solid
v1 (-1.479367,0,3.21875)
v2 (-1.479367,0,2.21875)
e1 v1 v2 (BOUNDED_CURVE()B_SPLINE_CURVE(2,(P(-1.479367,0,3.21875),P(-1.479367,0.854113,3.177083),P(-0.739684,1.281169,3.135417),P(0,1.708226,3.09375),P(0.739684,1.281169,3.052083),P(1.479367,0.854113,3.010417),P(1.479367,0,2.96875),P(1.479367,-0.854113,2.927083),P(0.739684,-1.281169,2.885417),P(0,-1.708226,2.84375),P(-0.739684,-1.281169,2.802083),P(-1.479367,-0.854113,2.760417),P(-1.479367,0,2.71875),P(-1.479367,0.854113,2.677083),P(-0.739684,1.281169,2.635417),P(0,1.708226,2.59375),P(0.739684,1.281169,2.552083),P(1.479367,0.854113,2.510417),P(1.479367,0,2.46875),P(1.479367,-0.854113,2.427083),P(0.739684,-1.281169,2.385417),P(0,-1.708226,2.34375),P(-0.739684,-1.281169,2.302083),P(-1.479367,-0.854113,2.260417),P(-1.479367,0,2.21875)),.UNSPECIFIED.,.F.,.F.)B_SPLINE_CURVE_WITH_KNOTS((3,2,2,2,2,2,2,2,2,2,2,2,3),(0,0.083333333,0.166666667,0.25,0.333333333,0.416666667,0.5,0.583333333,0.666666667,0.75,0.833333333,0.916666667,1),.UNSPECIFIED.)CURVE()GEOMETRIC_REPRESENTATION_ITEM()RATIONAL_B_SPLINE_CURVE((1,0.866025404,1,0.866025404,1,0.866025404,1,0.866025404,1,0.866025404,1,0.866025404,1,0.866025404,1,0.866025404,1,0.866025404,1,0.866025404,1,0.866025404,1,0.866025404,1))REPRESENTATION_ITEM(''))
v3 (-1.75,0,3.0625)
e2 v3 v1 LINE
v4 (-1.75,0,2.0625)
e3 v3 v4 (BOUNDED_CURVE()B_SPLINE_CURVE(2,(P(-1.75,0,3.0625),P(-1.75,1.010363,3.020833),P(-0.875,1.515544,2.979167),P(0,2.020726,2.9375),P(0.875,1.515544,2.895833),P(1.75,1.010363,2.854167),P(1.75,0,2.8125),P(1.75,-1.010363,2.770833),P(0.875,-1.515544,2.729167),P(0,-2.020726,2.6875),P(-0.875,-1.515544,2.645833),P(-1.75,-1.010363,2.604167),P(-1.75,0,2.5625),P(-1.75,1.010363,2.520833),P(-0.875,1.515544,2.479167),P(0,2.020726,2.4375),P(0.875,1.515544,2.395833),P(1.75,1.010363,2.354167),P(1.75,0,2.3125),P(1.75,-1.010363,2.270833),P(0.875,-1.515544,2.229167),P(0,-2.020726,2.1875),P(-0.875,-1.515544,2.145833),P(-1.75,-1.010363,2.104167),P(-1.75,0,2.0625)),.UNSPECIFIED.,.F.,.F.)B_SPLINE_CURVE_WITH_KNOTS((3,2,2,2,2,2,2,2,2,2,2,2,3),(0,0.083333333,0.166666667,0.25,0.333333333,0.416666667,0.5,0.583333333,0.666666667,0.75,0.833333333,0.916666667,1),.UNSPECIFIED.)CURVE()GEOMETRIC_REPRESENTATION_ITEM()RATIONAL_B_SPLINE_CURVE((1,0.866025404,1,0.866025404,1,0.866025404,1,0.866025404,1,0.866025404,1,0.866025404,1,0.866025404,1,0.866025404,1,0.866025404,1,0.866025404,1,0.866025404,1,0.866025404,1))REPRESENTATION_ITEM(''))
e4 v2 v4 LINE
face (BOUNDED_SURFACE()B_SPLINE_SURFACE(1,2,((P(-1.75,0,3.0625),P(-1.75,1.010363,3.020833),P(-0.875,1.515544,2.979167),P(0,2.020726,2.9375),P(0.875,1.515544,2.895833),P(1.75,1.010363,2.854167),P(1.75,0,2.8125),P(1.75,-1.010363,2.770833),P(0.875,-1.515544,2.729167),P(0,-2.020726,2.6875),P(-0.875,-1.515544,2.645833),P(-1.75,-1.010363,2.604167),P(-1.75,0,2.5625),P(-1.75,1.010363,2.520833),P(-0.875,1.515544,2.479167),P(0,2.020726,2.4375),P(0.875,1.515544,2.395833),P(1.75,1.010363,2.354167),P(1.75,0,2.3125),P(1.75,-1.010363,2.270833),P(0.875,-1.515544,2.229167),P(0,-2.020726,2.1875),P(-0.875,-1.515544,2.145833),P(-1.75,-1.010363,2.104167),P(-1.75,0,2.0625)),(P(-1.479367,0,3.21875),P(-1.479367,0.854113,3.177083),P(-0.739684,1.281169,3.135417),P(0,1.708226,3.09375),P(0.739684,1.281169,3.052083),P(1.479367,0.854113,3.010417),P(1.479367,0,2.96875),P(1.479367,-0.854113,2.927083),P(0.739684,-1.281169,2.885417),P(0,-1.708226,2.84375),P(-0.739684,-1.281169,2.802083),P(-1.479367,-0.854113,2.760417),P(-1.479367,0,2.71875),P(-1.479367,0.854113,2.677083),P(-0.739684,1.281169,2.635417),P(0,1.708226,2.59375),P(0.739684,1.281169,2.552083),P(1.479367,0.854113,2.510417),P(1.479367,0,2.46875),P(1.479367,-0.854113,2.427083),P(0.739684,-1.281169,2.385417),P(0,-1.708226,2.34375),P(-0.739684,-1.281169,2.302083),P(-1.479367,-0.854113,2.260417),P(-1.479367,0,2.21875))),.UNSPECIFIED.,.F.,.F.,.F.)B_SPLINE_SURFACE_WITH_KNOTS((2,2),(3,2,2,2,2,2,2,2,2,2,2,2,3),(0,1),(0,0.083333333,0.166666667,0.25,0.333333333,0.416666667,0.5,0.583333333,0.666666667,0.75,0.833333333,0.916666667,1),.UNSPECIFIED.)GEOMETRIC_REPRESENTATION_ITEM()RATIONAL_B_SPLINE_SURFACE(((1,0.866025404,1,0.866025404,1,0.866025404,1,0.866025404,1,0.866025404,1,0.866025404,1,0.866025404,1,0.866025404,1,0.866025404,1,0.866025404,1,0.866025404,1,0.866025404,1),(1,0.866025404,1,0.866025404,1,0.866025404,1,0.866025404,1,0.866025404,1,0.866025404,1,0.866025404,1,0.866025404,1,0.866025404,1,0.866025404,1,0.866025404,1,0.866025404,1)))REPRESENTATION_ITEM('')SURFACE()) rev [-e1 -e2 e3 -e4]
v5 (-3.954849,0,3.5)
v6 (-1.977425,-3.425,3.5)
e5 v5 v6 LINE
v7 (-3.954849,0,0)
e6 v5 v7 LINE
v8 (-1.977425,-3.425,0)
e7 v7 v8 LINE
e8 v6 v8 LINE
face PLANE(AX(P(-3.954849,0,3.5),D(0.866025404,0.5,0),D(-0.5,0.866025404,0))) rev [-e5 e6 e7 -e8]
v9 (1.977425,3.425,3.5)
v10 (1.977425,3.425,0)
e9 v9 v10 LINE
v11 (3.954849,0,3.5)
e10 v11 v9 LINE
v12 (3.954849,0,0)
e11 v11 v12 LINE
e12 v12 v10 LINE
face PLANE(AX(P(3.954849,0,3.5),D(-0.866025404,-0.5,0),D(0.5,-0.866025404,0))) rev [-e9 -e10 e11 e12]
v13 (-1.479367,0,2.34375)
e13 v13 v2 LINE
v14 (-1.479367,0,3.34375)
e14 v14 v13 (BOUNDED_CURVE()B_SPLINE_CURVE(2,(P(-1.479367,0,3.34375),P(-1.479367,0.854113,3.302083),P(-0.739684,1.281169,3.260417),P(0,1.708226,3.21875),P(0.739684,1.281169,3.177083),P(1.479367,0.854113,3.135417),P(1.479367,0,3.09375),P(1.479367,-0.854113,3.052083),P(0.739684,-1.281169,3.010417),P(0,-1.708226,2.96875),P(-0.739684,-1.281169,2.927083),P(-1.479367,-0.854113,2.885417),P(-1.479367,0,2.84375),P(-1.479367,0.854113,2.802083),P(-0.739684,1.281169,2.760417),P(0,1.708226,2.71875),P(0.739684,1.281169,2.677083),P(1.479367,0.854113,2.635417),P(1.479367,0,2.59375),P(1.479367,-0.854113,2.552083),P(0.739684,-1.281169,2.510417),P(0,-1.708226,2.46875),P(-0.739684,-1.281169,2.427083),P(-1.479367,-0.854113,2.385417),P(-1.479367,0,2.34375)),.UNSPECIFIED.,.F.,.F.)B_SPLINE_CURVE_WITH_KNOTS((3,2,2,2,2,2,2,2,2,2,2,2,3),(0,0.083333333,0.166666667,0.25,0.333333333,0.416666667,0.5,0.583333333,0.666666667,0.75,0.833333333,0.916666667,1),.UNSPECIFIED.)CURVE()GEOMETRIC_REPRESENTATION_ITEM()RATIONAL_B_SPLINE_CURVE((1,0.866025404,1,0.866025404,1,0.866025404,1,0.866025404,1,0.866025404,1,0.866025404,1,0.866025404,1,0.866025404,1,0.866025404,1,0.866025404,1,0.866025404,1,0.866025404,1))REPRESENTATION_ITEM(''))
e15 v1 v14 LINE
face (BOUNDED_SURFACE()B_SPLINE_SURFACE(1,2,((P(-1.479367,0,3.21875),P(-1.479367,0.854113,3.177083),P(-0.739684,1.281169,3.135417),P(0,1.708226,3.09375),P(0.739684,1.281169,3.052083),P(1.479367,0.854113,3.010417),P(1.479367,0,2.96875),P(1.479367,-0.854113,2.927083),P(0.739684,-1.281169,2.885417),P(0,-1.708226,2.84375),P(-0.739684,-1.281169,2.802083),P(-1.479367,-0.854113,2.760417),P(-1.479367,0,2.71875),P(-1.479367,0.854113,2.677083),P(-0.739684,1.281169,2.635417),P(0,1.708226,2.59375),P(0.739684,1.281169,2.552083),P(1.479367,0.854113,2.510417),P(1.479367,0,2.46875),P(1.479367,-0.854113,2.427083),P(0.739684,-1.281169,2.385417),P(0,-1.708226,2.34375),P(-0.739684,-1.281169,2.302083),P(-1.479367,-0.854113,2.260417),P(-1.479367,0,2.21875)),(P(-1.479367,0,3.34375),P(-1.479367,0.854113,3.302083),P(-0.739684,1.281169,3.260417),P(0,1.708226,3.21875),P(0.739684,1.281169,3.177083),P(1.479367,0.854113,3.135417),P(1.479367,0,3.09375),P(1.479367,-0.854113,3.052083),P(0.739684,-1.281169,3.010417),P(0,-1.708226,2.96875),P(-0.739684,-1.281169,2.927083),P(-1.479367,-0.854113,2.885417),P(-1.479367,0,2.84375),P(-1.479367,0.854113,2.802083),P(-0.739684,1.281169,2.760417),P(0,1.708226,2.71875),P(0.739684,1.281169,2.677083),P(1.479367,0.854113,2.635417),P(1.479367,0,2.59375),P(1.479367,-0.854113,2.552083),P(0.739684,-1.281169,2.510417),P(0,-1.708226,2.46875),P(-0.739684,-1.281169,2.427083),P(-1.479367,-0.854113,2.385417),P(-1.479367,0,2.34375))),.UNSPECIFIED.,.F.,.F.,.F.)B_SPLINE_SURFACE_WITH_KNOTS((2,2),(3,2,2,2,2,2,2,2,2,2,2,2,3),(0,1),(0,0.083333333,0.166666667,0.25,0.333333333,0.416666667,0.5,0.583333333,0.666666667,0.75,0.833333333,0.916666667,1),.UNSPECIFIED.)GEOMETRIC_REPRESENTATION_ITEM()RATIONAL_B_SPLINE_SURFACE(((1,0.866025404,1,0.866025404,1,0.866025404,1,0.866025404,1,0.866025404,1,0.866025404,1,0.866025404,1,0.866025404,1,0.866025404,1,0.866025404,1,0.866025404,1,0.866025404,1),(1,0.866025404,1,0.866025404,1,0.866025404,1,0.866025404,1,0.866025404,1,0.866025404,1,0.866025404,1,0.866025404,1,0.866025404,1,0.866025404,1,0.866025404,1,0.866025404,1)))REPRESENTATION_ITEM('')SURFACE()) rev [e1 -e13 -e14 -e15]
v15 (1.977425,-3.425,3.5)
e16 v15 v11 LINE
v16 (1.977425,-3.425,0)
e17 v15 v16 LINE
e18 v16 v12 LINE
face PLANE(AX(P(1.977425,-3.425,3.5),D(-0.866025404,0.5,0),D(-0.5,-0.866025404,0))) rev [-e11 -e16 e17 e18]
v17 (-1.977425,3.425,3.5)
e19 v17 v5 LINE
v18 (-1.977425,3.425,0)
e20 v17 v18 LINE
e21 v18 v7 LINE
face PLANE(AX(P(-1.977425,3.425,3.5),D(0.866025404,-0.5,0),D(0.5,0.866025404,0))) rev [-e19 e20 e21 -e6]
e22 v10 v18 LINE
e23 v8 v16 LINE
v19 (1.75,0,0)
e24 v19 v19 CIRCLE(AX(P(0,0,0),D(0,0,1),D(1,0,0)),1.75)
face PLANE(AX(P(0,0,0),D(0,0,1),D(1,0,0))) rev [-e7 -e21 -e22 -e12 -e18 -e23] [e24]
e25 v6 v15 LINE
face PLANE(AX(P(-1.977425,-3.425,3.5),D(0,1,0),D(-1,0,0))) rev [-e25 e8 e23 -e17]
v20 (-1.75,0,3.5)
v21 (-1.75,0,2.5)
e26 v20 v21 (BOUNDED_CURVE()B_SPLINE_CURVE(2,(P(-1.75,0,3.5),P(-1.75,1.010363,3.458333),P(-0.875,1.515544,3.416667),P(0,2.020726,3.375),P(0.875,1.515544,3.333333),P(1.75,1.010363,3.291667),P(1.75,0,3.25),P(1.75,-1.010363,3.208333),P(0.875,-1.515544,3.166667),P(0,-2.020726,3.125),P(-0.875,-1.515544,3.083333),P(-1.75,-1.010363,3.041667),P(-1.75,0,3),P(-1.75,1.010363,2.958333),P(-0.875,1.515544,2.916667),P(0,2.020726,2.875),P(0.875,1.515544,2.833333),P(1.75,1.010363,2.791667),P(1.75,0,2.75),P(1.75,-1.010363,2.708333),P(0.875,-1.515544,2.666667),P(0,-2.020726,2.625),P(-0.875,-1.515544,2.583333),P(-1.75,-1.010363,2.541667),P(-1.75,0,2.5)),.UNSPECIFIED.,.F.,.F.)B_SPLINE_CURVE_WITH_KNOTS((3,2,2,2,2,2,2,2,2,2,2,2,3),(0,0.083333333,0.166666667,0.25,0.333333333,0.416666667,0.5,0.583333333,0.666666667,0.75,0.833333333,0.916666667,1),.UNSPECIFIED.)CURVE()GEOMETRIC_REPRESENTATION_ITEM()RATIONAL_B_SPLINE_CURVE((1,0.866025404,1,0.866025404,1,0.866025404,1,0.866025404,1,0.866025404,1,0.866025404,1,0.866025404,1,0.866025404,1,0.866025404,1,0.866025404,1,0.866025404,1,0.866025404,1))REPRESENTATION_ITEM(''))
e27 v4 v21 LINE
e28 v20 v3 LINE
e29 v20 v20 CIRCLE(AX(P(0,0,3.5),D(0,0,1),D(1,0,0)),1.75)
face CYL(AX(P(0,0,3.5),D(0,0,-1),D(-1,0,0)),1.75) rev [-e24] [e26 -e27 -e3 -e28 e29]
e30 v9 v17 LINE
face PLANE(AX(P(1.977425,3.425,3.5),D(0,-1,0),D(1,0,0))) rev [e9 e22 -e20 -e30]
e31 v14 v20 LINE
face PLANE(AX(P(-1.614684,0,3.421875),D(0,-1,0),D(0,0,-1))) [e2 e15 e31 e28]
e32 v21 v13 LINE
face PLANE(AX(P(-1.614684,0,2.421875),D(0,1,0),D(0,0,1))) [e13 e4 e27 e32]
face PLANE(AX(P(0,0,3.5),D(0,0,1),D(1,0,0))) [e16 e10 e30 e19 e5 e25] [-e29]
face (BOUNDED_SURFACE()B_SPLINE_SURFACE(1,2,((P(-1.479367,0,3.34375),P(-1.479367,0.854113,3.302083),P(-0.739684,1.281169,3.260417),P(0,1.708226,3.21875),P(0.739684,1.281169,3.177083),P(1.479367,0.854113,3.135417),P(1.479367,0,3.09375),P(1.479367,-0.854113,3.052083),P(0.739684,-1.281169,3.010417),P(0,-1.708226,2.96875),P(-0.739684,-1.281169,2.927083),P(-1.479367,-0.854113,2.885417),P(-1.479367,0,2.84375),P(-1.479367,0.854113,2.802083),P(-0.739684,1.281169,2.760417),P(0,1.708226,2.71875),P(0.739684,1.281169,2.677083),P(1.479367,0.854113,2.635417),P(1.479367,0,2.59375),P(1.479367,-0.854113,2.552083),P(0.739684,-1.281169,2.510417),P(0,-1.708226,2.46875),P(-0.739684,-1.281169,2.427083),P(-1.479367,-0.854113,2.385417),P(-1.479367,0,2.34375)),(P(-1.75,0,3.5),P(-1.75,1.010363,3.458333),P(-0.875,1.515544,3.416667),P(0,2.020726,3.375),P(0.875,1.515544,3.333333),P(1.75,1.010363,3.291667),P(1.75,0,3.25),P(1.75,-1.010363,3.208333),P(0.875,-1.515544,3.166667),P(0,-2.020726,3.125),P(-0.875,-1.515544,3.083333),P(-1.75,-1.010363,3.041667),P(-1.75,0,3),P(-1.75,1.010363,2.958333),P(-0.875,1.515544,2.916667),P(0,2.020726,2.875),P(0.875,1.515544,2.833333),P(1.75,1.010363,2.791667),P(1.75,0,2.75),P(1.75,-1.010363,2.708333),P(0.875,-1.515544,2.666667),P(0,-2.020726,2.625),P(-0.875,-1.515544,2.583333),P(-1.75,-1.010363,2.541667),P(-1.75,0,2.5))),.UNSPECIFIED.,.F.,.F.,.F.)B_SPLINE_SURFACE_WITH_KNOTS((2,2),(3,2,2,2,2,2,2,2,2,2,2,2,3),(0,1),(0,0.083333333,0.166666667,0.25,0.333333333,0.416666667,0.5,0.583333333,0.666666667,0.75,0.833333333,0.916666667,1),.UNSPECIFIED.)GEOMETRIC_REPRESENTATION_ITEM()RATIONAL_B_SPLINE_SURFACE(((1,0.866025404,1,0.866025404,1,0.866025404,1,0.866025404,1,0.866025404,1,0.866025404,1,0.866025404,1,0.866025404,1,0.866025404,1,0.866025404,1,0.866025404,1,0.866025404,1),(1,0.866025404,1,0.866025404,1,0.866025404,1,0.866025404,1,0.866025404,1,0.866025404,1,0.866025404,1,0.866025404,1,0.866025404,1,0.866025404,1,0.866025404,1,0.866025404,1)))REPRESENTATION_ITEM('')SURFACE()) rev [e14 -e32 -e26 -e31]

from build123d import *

# Parameters (mm, degrees)
SKETCH1_R           = 1.75
BOSS_EXTRUDE1_DEPTH = 3.5
THREAD1_PITCH       = 0.5


with BuildPart() as part:
    # Sketch1 → Boss-Extrude1 (new body)
    with BuildSketch(Plane.XY):
        Polygon((3.954849344, 0), (1.977424672, 3.425), (-1.977424672, 3.425), (-3.954849344, 0), (-1.977424672, -3.425), (1.977424672, -3.425), align=None)
        Circle(SKETCH1_R, mode=Mode.SUBTRACT)
    extrude(amount=BOSS_EXTRUDE1_DEPTH)

    # Thread1: the profile of Thread Profile1 profile screwed along a right-hand helix of 2 turns, 6 arcs to a turn; built about Z, then put on its axis
    thread1_z = Axis((0, 0, 0), (0, 0, 1))
    thread1_corners = [(1.7503, 0, -0.000173205), (1.7503, 0, 0.437673204), (1.479367063, 0, 0.281249999), (1.479367062, 0, 0.156249999)]
    with BuildLine(mode=Mode.PRIVATE) as thread1_profile:
        Line(thread1_corners[0], thread1_corners[1])
        Line(thread1_corners[1], thread1_corners[2])
        Line(thread1_corners[2], thread1_corners[3])
        Line(thread1_corners[3], thread1_corners[0])
    thread1_cap = Face(thread1_profile.wire())
    thread1_turn_angles = [0, 30, 60, 90, 120, 150, 180, 210, 240, 270, 300, 330, 360]
    thread1_turn_weights = [1, 0.8660254037844387, 1, 0.8660254037844387, 1, 0.8660254037844387, 1, 0.8660254037844387, 1, 0.8660254037844387, 1, 0.8660254037844387, 1]
    thread1_turn_rails = [Edge.make_bspline([Vector(p[0], p[1], 0).rotate(thread1_z, thread1_turn_angles[k]) / thread1_turn_weights[k] + Vector(0, 0, p[2] + THREAD1_PITCH * thread1_turn_angles[k] / 360) for k in range(13)], [0, 0, 0, 1, 1, 2, 2, 3, 3, 4, 4, 5, 5, 6, 6, 6], 2, thread1_turn_weights) for p in thread1_corners]
    thread1_turn_sides = [Face.make_surface_from_curves(thread1_turn_rails[p[0]], thread1_turn_rails[p[1]]) for p in [(0, 1), (1, 2), (2, 3), (3, 0)]]
    thread1 = Plane(origin=(0, 0, 3.5), x_dir=(-1, 0, 0), z_dir=(0, 0, -1)) * Solid(Shell([*[p.moved(Location((0, 0, THREAD1_PITCH * i))) for i in range(2) for p in thread1_turn_sides], thread1_cap, thread1_cap.rotate(thread1_z, 720).moved(Location((0, 0, THREAD1_PITCH * 720 / 360)))]))
    add(thread1)


solid = part.part
